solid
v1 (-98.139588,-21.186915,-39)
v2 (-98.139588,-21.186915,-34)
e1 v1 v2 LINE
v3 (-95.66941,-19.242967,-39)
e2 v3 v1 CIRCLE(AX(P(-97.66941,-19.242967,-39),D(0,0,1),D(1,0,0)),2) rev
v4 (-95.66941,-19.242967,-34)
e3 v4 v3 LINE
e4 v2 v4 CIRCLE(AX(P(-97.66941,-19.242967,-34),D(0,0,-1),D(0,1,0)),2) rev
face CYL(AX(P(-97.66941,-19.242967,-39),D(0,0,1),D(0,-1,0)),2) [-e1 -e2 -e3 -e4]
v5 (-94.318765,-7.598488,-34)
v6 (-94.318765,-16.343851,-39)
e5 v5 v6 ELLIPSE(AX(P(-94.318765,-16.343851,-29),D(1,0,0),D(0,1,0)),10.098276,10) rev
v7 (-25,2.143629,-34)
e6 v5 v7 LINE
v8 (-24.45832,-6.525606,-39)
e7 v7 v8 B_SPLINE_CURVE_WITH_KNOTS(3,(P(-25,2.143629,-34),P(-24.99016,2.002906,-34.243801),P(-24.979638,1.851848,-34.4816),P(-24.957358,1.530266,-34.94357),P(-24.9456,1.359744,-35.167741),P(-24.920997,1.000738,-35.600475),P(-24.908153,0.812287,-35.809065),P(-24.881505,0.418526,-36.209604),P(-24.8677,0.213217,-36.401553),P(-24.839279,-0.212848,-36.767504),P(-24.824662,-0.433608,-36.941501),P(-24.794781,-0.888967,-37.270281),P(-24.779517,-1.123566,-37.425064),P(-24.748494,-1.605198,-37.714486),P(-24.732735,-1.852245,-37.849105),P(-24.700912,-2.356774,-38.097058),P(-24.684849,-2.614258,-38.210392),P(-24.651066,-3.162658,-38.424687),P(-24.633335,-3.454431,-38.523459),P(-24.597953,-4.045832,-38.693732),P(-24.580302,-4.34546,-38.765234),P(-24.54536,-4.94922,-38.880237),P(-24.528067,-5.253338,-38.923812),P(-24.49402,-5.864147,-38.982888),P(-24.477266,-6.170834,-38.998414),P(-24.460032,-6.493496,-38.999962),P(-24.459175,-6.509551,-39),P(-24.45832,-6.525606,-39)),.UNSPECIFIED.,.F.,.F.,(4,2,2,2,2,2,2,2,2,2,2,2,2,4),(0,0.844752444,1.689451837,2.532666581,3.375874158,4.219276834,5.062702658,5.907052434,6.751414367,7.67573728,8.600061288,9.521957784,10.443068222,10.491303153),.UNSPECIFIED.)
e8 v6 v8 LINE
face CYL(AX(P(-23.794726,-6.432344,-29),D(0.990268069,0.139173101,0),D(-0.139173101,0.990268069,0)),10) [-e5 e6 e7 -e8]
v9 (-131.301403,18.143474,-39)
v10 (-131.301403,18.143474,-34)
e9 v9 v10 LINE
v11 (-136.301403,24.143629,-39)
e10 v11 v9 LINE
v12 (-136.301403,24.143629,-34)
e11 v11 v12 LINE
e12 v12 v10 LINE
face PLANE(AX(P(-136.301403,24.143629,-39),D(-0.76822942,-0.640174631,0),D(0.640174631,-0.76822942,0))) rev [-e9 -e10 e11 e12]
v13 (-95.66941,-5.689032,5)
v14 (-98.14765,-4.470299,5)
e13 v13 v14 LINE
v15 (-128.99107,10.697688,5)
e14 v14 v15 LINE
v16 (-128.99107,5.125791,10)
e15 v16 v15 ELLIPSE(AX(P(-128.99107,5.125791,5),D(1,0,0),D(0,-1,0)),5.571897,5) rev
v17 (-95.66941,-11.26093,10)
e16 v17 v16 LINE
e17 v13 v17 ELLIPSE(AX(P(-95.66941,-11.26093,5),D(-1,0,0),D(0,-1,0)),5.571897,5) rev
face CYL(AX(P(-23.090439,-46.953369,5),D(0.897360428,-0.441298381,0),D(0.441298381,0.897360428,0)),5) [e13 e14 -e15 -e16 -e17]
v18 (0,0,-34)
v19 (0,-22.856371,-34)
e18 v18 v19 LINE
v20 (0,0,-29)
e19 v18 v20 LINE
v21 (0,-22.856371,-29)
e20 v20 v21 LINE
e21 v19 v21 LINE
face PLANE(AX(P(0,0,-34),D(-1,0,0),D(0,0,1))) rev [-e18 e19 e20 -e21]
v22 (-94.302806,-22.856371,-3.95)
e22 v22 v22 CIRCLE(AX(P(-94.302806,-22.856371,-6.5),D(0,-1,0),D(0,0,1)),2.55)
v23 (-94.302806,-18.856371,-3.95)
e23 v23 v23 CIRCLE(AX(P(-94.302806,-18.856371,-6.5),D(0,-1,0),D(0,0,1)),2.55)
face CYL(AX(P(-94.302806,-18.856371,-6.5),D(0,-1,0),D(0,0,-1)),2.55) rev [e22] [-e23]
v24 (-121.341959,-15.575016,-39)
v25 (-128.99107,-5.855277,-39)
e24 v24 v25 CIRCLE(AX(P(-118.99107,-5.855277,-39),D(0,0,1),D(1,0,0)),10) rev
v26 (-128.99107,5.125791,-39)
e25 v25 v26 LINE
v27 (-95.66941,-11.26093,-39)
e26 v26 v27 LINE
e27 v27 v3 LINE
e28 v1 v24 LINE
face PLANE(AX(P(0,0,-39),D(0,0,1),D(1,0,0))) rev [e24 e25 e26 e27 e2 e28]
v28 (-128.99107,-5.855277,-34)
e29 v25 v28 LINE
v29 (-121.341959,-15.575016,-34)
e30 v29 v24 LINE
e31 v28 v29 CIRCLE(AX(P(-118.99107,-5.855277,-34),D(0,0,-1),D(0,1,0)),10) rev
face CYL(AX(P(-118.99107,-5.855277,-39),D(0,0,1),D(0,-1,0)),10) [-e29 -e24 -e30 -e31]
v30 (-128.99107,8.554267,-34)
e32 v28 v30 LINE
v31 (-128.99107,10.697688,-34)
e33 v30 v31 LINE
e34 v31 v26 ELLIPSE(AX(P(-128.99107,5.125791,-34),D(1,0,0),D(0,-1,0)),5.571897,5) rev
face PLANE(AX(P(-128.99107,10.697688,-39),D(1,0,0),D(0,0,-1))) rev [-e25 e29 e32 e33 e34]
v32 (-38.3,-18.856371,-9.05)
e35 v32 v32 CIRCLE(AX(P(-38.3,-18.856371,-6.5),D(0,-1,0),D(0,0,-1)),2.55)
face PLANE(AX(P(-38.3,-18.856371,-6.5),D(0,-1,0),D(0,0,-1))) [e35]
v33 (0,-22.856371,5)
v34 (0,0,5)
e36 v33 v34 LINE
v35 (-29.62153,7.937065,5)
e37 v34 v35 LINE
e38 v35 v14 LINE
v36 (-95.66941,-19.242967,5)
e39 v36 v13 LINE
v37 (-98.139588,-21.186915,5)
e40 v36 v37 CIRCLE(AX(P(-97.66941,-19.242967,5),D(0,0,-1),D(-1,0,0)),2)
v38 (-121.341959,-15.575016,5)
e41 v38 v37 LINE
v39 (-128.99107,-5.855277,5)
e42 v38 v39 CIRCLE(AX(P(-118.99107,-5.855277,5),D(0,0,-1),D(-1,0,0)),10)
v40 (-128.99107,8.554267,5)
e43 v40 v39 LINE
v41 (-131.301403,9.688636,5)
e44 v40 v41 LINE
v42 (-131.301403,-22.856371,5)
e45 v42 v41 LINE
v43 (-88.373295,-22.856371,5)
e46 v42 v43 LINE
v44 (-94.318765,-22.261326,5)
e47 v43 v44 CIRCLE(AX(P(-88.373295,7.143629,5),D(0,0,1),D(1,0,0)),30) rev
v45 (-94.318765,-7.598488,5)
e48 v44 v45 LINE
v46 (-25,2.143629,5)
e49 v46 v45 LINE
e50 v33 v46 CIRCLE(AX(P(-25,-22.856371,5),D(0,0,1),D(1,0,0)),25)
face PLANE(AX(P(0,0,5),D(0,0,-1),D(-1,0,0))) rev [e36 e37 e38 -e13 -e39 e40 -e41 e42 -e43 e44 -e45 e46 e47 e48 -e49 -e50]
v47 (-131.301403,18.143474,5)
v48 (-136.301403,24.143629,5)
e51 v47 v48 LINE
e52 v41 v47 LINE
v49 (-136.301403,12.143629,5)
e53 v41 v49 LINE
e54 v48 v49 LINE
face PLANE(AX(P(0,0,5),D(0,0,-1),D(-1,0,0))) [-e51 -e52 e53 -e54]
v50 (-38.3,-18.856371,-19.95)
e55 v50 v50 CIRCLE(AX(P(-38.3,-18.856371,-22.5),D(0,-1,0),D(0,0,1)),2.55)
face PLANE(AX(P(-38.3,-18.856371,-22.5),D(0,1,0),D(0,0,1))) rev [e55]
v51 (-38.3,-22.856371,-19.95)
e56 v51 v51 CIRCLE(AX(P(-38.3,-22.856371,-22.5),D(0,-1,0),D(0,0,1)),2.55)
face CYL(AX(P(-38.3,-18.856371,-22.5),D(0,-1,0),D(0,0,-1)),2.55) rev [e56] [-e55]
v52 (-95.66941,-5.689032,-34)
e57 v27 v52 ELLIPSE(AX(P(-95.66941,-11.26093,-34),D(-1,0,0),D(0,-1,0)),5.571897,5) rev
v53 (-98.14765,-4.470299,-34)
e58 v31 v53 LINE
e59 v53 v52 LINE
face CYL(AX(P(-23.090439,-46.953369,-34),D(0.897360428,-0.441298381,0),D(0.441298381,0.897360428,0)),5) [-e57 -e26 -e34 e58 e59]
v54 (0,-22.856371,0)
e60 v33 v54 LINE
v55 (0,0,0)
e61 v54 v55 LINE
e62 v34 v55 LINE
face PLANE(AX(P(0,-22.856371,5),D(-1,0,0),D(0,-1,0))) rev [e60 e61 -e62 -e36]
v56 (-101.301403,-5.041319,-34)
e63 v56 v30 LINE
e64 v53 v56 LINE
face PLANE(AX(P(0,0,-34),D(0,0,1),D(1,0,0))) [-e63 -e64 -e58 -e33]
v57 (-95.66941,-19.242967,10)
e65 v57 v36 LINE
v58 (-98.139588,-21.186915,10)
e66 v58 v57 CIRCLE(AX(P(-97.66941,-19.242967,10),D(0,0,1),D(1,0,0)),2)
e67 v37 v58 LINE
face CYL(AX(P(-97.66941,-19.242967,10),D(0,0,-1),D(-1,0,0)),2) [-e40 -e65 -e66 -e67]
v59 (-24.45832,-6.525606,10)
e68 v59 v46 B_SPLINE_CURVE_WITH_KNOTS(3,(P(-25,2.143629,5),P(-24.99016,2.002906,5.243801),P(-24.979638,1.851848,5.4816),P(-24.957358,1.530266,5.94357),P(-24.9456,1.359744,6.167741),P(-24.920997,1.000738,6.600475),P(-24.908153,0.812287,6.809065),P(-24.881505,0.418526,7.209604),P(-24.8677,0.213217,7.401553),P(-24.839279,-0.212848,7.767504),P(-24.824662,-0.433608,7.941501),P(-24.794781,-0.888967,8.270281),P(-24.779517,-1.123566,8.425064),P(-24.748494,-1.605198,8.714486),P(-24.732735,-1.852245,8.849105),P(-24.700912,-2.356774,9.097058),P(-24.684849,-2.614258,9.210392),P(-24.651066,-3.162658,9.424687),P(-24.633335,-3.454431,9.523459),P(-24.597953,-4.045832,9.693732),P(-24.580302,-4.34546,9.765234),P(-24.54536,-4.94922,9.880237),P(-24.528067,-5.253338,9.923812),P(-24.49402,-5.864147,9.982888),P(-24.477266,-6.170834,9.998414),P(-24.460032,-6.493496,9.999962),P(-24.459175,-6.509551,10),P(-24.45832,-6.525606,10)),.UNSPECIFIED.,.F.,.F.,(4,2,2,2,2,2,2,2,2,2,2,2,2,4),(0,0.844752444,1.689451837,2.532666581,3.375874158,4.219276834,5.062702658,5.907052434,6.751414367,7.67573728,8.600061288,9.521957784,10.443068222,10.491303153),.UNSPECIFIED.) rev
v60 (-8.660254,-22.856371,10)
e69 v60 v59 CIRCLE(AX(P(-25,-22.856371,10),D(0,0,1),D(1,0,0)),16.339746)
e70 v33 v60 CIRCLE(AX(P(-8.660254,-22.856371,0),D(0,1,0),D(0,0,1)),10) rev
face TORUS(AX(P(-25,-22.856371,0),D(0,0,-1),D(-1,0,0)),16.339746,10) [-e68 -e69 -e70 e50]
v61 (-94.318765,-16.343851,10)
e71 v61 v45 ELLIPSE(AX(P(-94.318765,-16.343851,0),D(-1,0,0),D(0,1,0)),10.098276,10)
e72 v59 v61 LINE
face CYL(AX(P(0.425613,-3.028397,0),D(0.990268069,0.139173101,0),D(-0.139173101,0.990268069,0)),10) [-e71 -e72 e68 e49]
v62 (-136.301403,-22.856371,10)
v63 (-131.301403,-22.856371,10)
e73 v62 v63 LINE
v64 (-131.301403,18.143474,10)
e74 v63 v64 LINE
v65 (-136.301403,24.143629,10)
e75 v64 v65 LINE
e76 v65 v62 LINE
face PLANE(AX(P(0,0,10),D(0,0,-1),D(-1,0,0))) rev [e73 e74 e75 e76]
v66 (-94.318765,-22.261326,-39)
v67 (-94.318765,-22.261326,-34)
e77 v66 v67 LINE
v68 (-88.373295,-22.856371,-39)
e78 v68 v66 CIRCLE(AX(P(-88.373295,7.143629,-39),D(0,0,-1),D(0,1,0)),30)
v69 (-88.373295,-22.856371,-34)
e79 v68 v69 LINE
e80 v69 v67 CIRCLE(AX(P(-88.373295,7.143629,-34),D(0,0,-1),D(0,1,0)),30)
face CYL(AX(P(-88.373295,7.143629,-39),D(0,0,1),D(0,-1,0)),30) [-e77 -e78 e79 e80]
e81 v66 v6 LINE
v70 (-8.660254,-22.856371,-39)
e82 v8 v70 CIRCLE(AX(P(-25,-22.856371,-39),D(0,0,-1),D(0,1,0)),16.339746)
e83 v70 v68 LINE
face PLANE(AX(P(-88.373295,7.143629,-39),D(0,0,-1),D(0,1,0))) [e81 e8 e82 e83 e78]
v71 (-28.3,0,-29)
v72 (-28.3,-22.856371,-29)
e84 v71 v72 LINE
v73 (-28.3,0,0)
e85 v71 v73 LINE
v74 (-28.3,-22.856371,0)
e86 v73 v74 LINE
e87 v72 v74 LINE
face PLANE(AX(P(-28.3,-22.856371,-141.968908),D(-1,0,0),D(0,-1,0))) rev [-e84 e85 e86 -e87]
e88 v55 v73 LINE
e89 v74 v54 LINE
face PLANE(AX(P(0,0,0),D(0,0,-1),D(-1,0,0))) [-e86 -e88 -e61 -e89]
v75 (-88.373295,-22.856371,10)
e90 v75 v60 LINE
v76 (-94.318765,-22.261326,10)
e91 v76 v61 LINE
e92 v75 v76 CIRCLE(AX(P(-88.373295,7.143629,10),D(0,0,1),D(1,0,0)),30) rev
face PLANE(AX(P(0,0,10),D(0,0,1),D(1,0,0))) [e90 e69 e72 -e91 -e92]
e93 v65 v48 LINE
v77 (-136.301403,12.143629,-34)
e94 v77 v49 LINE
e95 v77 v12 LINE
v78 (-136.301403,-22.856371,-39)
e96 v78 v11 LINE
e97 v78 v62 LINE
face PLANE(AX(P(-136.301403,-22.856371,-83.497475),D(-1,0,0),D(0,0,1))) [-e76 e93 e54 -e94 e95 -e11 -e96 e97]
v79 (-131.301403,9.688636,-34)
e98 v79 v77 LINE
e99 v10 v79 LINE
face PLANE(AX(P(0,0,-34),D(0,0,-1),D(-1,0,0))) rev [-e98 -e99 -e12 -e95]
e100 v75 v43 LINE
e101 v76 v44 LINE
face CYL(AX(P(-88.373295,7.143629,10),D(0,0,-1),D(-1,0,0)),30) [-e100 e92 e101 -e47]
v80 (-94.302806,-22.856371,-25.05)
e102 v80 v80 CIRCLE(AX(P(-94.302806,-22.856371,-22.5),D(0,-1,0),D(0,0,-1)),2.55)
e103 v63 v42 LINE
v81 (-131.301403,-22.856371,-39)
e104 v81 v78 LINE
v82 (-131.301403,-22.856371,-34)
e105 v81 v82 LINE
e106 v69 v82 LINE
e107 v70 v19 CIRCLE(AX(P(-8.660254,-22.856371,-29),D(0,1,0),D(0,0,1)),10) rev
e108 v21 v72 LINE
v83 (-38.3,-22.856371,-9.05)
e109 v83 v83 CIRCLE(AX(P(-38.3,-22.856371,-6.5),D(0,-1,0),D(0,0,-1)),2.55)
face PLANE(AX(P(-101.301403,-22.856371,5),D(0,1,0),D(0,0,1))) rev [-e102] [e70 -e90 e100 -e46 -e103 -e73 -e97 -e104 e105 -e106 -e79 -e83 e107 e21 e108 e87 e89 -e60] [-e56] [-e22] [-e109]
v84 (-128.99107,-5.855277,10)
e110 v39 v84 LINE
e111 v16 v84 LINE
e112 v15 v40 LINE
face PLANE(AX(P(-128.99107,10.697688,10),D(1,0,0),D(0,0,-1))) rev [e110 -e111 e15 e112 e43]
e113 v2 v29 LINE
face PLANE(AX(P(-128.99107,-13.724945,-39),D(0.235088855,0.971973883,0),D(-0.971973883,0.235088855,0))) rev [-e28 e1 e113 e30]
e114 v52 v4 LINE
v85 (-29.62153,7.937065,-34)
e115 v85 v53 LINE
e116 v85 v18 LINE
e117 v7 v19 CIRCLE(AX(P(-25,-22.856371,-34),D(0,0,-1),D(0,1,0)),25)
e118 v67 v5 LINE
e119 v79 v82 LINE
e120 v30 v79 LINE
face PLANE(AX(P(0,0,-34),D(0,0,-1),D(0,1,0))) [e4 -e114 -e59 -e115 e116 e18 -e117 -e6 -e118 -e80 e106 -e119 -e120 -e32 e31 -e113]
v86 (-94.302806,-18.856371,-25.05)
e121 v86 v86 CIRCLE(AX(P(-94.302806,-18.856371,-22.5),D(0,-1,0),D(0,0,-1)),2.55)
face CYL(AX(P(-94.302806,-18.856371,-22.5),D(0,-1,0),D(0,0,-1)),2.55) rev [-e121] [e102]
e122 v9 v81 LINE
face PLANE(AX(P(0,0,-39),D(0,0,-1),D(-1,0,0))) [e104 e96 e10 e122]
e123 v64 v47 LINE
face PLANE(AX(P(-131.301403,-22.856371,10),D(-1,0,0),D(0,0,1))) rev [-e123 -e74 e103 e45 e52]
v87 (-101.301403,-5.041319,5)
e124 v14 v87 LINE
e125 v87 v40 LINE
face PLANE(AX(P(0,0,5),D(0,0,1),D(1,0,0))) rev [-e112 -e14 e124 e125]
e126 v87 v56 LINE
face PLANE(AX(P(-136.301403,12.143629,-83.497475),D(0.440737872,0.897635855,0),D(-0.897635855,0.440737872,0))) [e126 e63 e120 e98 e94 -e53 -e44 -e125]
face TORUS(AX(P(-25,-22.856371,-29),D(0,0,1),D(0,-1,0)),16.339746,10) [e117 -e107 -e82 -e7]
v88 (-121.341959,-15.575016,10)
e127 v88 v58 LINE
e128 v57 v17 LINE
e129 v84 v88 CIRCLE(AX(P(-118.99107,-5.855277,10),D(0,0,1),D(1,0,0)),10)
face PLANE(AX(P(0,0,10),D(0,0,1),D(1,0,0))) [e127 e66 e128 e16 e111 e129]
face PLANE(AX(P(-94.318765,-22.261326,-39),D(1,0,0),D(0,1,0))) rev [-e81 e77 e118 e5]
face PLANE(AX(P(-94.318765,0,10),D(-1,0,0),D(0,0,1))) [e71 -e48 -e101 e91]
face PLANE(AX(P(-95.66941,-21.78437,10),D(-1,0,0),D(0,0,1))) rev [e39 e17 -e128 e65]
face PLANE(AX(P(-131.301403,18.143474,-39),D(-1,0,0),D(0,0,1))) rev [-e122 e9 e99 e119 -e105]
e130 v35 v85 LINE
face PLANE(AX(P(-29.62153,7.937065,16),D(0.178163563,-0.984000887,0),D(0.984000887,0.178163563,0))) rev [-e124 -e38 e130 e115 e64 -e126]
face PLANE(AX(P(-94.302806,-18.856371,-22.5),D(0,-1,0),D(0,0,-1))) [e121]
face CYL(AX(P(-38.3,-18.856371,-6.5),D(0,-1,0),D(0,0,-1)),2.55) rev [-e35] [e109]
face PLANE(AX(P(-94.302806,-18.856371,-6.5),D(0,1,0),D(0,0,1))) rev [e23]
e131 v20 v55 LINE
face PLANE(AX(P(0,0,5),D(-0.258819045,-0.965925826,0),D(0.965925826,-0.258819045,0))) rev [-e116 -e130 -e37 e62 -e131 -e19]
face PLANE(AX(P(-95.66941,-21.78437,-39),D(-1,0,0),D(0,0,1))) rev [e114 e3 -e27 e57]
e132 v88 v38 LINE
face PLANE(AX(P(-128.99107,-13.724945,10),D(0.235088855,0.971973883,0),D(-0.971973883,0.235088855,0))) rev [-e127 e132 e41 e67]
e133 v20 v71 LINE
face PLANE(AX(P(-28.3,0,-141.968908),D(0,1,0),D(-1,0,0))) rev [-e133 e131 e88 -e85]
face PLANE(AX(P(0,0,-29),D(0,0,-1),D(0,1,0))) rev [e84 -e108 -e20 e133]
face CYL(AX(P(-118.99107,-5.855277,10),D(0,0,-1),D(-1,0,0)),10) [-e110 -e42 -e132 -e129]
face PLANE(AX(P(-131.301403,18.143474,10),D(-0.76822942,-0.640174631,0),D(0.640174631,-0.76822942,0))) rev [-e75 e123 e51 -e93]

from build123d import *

# Parameters (mm, degrees)
BOSS_EXTRUDE1_DEPTH  = 5
BOSS_EXTRUDE3_DEPTH  = 29
SKETCH7_R            = 2.55
CUT_EXTRUDE1_DEPTH   = 4
BOSS_EXTRUDE4_DEPTH  = 5
CUT_EXTRUDE2_DEPTH   = 50
BOSS_EXTRUDE5_DEPTH  = 39
BOSS_EXTRUDE6_DEPTH  = 5
BOSS_EXTRUDE7_DEPTH  = 5
BOSS_EXTRUDE8_DEPTH  = 5
FILLET1_START        = -96.499038859
FILLET1_DEPTH        = 93.561345122
FILLET1_2_ANGLE      = 90
BOSS_EXTRUDE9_DEPTH  = 5
FILLET2_R            = 10
FILLET3_R            = 5
FILLET4_R            = 2
BOSS_EXTRUDE10_START = 5
BOSS_EXTRUDE10_DEPTH = 5
FILLET5_R            = 10
BOSS_EXTRUDE11_DEPTH = 5
FILLET6_R            = 10
FILLET7_R            = 5
FILLET8_R            = 2


with BuildPart() as part:
    # Sketch1 → Boss-Extrude1 (new body)
    with BuildSketch(Plane.XY):
        Polygon((0, 0), (-101.301402794, 27.143629071), (-101.301402794, -22.856370929), (0, -22.856370929), align=None)
    extrude(amount=BOSS_EXTRUDE1_DEPTH)

    # Sketch3 → Boss-Extrude3 (add)
    with BuildSketch(Plane(origin=(0, 0, 0), x_dir=(-1, 0, 0), z_dir=(0, 0, -1))):
        Polygon((101.301402794, 27.143629071), (101.301402794, -22.856370929), (28.3, -22.856370929), (28.3, 0), (0, 0), align=None)
    extrude(amount=BOSS_EXTRUDE3_DEPTH)

    # Sketch7 → Cut-Extrude1 (cut)
    with BuildSketch(Plane.XZ.offset(22.856370929)):
        with Locations(Location((-38.3, -6.5, 0), (0, 0, 270))):
            Circle(SKETCH7_R)
        with Locations(Location((-38.3, -22.5, 0), (0, 0, 90))):
            Circle(SKETCH7_R)
        with Locations(Location((-94.302805589, -22.5, 0), (0, 0, 270))):
            Circle(SKETCH7_R)
        with Locations(Location((-94.302805589, -6.5, 0), (0, 0, 90))):
            Circle(SKETCH7_R)
    extrude(amount=-CUT_EXTRUDE1_DEPTH, mode=Mode.SUBTRACT)

    # Sketch8 → Boss-Extrude4 (add)
    with BuildSketch(Plane(origin=(0, 0, -29), x_dir=(-1, 0, 0), z_dir=(0, 0, -1))):
        Polygon((0, 0), (0, -22.856370929), (28.3, -22.856370929), (101.301402794, -22.856370929), (101.301402794, 27.143629071), align=None)
    extrude(amount=BOSS_EXTRUDE4_DEPTH)

    # Sketch9 → Cut-Extrude2 (cut)
    with BuildSketch(Plane(origin=(0, 0, -34), x_dir=(-1, 0, 0), z_dir=(0, 0, -1))):
        Polygon((101.301402794, 27.143629071), (29.621530414, 7.937065153), (101.301402794, -5.041318946), align=None)
    extrude(amount=-CUT_EXTRUDE2_DEPTH, mode=Mode.SUBTRACT)

    # Sketch10 → Boss-Extrude5 (add)
    with BuildSketch(Plane.XY.offset(5)):
        Polygon((-101.301402794, -22.856370929), (-136.301402794, -22.856370929), (-136.301402794, 12.143629071), (-101.301402794, -5.041318946), align=None)
    extrude(amount=-BOSS_EXTRUDE5_DEPTH)

    # Sketch11 → Boss-Extrude6 (add)
    with BuildSketch(Plane.XY.offset(5)):
        Polygon((-136.301402794, -22.856370929), (-131.301402794, -22.856370929), (-131.301402794, 18.143473933), (-136.301402794, 24.143629071), align=None)
    extrude(amount=BOSS_EXTRUDE6_DEPTH)

    # Sketch12 → Boss-Extrude7 (add)
    with BuildSketch(Plane(origin=(0, 0, -34), x_dir=(-1, 0, 0), z_dir=(0, 0, -1))):
        Polygon((136.301402794, -22.856370929), (136.301402794, 24.143629071), (131.301402794, 18.143473933), (131.301402794, -22.856370929), align=None)
    extrude(amount=BOSS_EXTRUDE7_DEPTH)

    # Sketch13 → Boss-Extrude8 (add)
    with BuildSketch(Plane.XY.offset(5)):
        with BuildLine():
            ThreePointArc((0, -22.856370929), (-7.32233047, -5.178701399), (-25, 2.143629071))
            Line((-25, 2.143629071), (-94.318764812, -7.598487996))
            Line((-94.318764812, -7.598487996), (-94.318764812, -22.261326085))
            ThreePointArc((-94.318764812, -22.261326085), (-91.360881343, -22.707239046), (-88.373294914, -22.856370929))
            Line((-88.373294914, -22.856370929), (0, -22.856370929))
        make_face()
    extrude(amount=BOSS_EXTRUDE8_DEPTH)

    # Fillet1: read off the stored shape, not the designer's step
    # Fillet1 outline → Fillet1 (cut)
    with BuildSketch(Plane(origin=(0, 0, 0), x_dir=(-0.13917310096006896, 0.9902680687415698, 0), z_dir=(0.9902680687415698, 0.13917310096006896, 0)).offset(FILLET1_START)):
        with BuildLine():
            ThreePointArc((-3.058159094, 10), (1.941840906, 8.660254038), (5.602094944, 5))
            Line((5.602094944, 5), (5.602094944, 10))
            Line((5.602094944, 10), (-3.058159094, 10))
        make_face()
    extrude(amount=FILLET1_DEPTH, mode=Mode.SUBTRACT)

    # Fillet1 2 outline → Fillet1 2 (revolve, cut)
    with BuildSketch(Plane(origin=(-25, -22.856370929, 0), x_dir=(1, 0, 0), z_dir=(0, -1, 0))):
        with BuildLine():
            Line((25, 10), (16.339745962, 10))
            ThreePointArc((16.339745962, 10), (21.339745962, 8.660254038), (25, 5))
            Line((25, 5), (25, 10))
        make_face()
    revolve(axis=Axis((-25, -22.856370929, 0), (0, 0, 1)), revolution_arc=FILLET1_2_ANGLE, mode=Mode.SUBTRACT)

    # Sketch14 → Boss-Extrude9 (add)
    with BuildSketch(Plane.XY.offset(5)):
        Polygon((-128.991070269, 10.697688119), (-95.669410429, -5.689032412), (-95.669410429, -21.784370313), (-128.991070269, -13.724945051), align=None)
    extrude(amount=BOSS_EXTRUDE9_DEPTH)

    # Fillet2
    fillet2_edges = [part.edges().sort_by_distance(p)[0] for p in [
        (-128.991070269, -13.724945051, 7.5),
    ]]
    fillet(fillet2_edges, radius=FILLET2_R)

    # Fillet3
    fillet3_edges = [part.edges().sort_by_distance(p)[0] for p in [
        (-112.330240349, 2.504327853, 10),
    ]]
    fillet(fillet3_edges, radius=FILLET3_R - 0.0001)  # a hair under: the kernel refuses the full size

    # Fillet4
    fillet4_edges = [part.edges().sort_by_distance(p)[0] for p in [
        (-95.669410429, -21.784370313, 7.5),
    ]]
    fillet(fillet4_edges, radius=FILLET4_R)

    # Sketch15 → Boss-Extrude10 (add)
    with BuildSketch(Plane(origin=(0, 0, -34), x_dir=(-1, 0, 0), z_dir=(0, 0, -1)).offset(BOSS_EXTRUDE10_START)):
        with BuildLine():
            Line((88.373294914, -22.856370929), (80, -22.856370929))
            Line((80, -22.856370929), (0, -22.856370929))
            ThreePointArc((0, -22.856370929), (7.32233047, -5.178701399), (25, 2.143629071))
            Line((25, 2.143629071), (94.318764812, -7.598487996))
            Line((94.318764812, -7.598487996), (94.318764812, -22.261326085))
            ThreePointArc((94.318764812, -22.261326085), (91.360881343, -22.707239046), (88.373294914, -22.856370929))
        make_face()
    extrude(amount=-BOSS_EXTRUDE10_DEPTH)

    # Fillet5
    # the kernel refuses this fillet: 10 mm, written as the material it takes off along each edge
    with BuildSketch(Plane(origin=(-3.560067398, 5.156815095, -39), x_dir=(0, 0, 1), z_dir=(-0.9902680687415698, -0.13917310096006932, 0))) as fillet5_piece_1:
        with BuildLine():
            CenterArc((10, -8.660254038), FILLET5_R, 120, 60)
            Line((0, -8.660254038), (0, 0))
            Line((0, 0), (5, 0))
        make_face()
    extrude(amount=113.301270189, mode=Mode.SUBTRACT)
    # the kernel refuses this fillet: 10 mm, written as the material it takes off along each edge
    with BuildSketch(Plane(origin=(-25, -22.856370929, -39), x_dir=(0.6477837249350054, -0.7618242879492156, 0), z_dir=(-0.7618242879492156, -0.6477837249350054, 0))) as fillet5_2_piece_1:
        with BuildLine():
            CenterArc((16.339745962, 10), FILLET5_R, 270, 60)
            Line((25, 5), (25, 0))
            Line((25, 0), (16.339745962, 0))
        make_face()
    revolve(axis=Axis((-25, -22.856370929, -39), (0, 0, 1)), revolution_arc=147.330675393, mode=Mode.SUBTRACT)

    # Sketch16 → Boss-Extrude11 (add)
    with BuildSketch(Plane(origin=(0, 0, -34), x_dir=(-1, 0, 0), z_dir=(0, 0, -1))):
        Polygon((128.991070269, 10.697688119), (95.669410429, -5.689032412), (95.669410429, -21.784370313), (128.991070269, -13.724945051), align=None)
    extrude(amount=BOSS_EXTRUDE11_DEPTH)

    # Fillet6
    fillet6_edges = [part.edges().sort_by_distance(p)[0] for p in [
        (-128.991070269, -13.724945051, -36.5),
    ]]
    fillet(fillet6_edges, radius=FILLET6_R)

    # Fillet7
    fillet7_edges = [part.edges().sort_by_distance(p)[0] for p in [
        (-112.330240349, 2.504327853, -39),
    ]]
    fillet(fillet7_edges, radius=FILLET7_R - 0.0001)  # a hair under: the kernel refuses the full size

    # Fillet8
    fillet8_edges = [part.edges().sort_by_distance(p)[0] for p in [
        (-95.669410429, -21.784370313, -36.5),
    ]]
    fillet(fillet8_edges, radius=FILLET8_R)


solid = part.part
